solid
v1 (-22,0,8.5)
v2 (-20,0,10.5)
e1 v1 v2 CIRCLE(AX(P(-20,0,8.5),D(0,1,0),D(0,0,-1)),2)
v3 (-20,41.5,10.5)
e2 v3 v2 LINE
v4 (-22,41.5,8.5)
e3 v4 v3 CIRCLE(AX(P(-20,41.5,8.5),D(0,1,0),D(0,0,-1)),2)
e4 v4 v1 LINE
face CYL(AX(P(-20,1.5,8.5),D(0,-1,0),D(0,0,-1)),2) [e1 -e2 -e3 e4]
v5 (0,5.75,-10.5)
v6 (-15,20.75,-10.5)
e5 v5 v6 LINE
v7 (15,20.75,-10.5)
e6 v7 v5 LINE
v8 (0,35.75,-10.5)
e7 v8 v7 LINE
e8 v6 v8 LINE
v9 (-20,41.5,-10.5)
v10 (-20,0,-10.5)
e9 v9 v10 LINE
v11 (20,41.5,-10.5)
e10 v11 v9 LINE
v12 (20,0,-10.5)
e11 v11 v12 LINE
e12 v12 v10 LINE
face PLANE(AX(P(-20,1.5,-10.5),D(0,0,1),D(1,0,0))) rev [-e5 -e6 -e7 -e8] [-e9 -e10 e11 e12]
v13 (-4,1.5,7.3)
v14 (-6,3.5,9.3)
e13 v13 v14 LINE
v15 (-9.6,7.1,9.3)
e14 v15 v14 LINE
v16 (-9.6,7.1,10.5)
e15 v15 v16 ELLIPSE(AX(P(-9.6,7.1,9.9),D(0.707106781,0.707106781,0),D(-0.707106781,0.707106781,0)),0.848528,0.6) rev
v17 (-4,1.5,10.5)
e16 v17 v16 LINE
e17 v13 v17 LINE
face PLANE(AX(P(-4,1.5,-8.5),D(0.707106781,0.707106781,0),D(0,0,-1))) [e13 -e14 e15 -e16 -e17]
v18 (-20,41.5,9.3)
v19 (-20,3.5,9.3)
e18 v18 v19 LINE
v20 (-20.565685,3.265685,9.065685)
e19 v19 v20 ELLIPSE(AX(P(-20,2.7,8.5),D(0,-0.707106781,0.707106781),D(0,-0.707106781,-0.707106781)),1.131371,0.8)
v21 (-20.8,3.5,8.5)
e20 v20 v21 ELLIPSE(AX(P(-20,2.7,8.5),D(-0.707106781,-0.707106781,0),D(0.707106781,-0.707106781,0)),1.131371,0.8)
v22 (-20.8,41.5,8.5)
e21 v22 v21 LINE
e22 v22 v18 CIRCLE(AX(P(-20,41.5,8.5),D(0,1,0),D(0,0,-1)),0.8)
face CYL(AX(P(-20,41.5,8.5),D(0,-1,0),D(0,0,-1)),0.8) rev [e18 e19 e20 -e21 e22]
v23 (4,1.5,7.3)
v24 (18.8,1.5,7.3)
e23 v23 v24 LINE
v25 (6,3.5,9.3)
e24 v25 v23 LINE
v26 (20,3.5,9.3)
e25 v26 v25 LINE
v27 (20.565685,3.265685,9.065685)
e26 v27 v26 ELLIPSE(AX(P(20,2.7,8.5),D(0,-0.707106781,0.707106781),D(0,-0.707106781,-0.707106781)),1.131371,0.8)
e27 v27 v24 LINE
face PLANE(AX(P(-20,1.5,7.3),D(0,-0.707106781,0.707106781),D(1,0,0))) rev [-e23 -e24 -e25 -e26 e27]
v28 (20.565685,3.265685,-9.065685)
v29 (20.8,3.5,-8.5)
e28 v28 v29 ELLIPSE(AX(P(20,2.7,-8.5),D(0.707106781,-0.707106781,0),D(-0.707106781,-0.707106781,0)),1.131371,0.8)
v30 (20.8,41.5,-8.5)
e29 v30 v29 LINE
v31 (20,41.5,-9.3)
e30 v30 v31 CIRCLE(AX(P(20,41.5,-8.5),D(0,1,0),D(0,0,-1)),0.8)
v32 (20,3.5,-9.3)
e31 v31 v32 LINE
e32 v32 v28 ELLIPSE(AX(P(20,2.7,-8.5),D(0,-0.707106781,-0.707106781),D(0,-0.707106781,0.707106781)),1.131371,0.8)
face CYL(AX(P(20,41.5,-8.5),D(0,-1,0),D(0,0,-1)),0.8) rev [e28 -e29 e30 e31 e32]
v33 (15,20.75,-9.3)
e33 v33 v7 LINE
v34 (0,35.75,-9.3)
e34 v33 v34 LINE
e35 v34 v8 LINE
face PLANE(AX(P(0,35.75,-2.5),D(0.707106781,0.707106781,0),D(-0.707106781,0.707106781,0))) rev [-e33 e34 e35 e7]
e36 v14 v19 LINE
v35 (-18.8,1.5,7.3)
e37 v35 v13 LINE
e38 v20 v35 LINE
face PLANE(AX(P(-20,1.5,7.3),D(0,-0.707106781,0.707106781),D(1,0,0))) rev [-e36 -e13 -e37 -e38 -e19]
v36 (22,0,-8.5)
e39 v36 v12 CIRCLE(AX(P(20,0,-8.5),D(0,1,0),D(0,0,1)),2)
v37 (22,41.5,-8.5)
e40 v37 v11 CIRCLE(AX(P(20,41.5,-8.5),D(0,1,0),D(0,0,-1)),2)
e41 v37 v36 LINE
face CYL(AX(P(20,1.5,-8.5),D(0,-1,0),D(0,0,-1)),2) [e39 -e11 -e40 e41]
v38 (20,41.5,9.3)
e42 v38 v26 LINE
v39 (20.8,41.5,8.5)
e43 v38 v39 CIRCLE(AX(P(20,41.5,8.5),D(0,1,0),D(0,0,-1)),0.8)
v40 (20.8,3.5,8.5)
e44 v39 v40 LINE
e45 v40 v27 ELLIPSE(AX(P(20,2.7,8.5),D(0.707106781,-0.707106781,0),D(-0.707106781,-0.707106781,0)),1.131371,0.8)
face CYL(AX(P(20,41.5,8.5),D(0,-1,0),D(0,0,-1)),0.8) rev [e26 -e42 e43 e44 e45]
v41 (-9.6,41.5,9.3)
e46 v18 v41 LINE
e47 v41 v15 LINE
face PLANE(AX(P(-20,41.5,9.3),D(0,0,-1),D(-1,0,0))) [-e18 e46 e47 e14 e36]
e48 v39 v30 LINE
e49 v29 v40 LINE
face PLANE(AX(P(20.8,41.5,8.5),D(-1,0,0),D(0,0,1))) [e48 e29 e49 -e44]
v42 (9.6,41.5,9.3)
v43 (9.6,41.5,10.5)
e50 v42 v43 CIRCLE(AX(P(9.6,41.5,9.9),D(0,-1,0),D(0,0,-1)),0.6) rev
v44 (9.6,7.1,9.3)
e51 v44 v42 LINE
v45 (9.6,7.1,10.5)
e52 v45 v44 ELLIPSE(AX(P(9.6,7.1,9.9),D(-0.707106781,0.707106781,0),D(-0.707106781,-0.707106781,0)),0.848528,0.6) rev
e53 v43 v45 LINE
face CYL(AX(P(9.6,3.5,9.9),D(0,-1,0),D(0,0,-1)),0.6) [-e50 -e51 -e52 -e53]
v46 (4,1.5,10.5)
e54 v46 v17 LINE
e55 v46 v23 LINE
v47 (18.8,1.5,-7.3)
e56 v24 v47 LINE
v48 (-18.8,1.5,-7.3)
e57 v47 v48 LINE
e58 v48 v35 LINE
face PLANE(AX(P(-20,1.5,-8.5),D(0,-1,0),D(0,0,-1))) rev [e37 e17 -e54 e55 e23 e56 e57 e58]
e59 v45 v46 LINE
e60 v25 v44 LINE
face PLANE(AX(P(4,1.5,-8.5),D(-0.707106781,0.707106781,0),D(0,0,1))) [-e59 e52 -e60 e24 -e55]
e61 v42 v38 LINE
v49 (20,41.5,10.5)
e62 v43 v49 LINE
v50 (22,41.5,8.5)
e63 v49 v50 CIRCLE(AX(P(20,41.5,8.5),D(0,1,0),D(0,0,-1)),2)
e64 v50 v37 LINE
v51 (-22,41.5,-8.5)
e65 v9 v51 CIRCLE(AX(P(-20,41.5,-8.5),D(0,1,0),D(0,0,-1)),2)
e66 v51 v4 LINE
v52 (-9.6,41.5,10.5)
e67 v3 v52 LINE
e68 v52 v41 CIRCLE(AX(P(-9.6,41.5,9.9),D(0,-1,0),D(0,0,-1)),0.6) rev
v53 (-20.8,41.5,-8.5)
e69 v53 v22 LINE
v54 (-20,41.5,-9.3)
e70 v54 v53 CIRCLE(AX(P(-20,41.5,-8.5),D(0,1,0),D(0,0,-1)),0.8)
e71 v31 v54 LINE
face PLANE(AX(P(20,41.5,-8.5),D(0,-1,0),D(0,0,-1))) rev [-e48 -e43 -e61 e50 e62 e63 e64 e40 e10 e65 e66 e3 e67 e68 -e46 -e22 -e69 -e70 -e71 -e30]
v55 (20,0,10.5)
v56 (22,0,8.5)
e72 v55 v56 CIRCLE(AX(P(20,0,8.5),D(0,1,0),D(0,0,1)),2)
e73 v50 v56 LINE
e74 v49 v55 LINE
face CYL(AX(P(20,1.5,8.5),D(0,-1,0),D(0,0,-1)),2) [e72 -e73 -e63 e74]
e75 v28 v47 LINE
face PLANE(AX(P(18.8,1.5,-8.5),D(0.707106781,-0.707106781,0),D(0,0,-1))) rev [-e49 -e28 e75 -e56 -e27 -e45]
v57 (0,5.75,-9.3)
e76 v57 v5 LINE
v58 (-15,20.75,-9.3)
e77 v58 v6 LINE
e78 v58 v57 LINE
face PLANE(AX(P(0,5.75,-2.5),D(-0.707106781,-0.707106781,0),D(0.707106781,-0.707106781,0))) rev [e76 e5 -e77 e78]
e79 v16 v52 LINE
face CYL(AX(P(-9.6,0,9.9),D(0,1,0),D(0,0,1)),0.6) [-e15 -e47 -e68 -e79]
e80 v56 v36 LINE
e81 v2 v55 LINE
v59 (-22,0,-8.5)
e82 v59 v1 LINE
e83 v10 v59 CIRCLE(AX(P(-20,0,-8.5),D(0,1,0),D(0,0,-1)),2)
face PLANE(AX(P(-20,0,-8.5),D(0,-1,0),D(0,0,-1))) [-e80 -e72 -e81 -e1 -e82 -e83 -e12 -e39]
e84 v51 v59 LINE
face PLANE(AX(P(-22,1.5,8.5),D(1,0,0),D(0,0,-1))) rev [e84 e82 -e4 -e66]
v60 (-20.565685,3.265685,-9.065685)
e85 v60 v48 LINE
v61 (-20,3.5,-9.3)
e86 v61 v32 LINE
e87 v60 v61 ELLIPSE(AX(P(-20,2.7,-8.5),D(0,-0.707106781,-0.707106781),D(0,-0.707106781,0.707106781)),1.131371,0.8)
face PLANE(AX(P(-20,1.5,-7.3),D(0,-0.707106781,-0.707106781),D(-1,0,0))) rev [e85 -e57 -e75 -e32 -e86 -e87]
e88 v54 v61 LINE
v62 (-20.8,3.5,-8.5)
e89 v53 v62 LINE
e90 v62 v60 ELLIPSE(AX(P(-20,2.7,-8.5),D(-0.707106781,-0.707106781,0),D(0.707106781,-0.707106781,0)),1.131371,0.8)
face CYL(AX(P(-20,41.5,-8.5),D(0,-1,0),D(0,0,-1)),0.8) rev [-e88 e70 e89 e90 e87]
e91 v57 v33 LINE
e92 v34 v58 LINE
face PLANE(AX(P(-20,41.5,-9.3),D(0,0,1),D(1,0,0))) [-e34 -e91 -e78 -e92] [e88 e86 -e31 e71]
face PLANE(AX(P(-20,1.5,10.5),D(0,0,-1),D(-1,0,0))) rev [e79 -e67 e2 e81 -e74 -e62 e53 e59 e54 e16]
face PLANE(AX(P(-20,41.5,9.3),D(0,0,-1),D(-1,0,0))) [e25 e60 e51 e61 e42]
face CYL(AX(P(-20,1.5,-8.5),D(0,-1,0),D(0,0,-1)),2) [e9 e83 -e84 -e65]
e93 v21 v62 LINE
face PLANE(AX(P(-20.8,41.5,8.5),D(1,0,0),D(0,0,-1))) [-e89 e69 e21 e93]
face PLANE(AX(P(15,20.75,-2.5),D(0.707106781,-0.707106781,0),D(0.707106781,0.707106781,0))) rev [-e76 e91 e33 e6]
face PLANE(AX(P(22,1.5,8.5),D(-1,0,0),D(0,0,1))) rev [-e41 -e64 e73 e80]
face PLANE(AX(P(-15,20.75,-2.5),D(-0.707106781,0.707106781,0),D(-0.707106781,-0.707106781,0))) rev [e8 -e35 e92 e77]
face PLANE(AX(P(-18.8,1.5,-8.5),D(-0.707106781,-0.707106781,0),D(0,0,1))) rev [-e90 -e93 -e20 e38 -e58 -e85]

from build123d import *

# Parameters (mm, degrees)
RESSALTO_EXTRUS_O1_DEPTH = 1.5
RESSALTO_EXTRUS_O2_DEPTH = 40
ESBO_O4_W                = 18
ESBO_O4_H                = 3
CORTE_EXTRUS_O1_DEPTH    = 40
CORTE_EXTRUS_O2_DEPTH    = 8
CHANFRO1_SIZE            = 5
CHANFRO2_SIZE            = 2
FILETE2_START            = 6.5
FILETE2_DEPTH            = 35.5
FILETE2_START_2          = -3
FILETE2_2_DEPTH          = 1.232233047
FILETE3_START            = 6.5
FILETE3_DEPTH            = 35.5
FILETE3_START_2          = 1.767766953
FILETE3_2_DEPTH          = 1.232233047


with BuildPart() as part:
    # Esboço1 → Ressalto-extrusão1 (new body)
    with BuildSketch(Plane(origin=(0, 0, 0), x_dir=(1, 0, 0), z_dir=(0, 1, 0))):
        with BuildLine():
            Line((-20, -10.5), (20, -10.5))
            ThreePointArc((20, -10.5), (21.414213562, -9.914213562), (22, -8.5))
            Line((22, -8.5), (22, 8.5))
            ThreePointArc((22, 8.5), (21.414213562, 9.914213562), (20, 10.5))
            Line((20, 10.5), (-20, 10.5))
            ThreePointArc((-20, 10.5), (-21.414213562, 9.914213562), (-22, 8.5))
            Line((-22, 8.5), (-22, -8.5))
            ThreePointArc((-22, -8.5), (-21.414213562, -9.914213562), (-20, -10.5))
        make_face()
    extrude(amount=RESSALTO_EXTRUS_O1_DEPTH)

    # Esboço3 → Ressalto-extrusão2 (add)
    with BuildSketch(Plane(origin=(0, 1.5, 0), x_dir=(1, 0, 0), z_dir=(0, 1, 0))):
        with BuildLine():
            Line((-20, -10.5), (20, -10.5))
            ThreePointArc((20, -10.5), (21.414213562, -9.914213562), (22, -8.5))
            Line((22, -8.5), (22, 8.5))
            ThreePointArc((22, 8.5), (21.414213562, 9.914213562), (20, 10.5))
            Line((20, 10.5), (-20, 10.5))
            ThreePointArc((-20, 10.5), (-21.414213562, 9.914213562), (-22, 8.5))
            Line((-22, 8.5), (-22, -8.5))
            ThreePointArc((-22, -8.5), (-21.414213562, -9.914213562), (-20, -10.5))
        make_face()
        with BuildLine():
            Line((-20, 9.3), (20, 9.3))
            ThreePointArc((20, 9.3), (20.565685425, 9.065685425), (20.8, 8.5))
            Line((20.8, 8.5), (20.8, -8.5))
            ThreePointArc((20.8, -8.5), (20.565685425, -9.065685425), (20, -9.3))
            Line((20, -9.3), (-20, -9.3))
            ThreePointArc((-20, -9.3), (-20.565685425, -9.065685425), (-20.8, -8.5))
            Line((-20.8, -8.5), (-20.8, 8.5))
            ThreePointArc((-20.8, 8.5), (-20.565685425, 9.065685425), (-20, 9.3))
        make_face(mode=Mode.SUBTRACT)
    extrude(amount=RESSALTO_EXTRUS_O2_DEPTH)

    # Esboço4 → Corte-extrusão1 (cut)
    with BuildSketch(Plane(origin=(0, 41.5, 0), x_dir=(1, 0, 0), z_dir=(0, 1, 0))):
        with Locations((0, -9.3)):
            Rectangle(ESBO_O4_W, ESBO_O4_H)
    extrude(amount=-CORTE_EXTRUS_O1_DEPTH, mode=Mode.SUBTRACT)

    # Esboço5 → Corte-extrusão2 (cut)
    with BuildSketch(Plane(origin=(0, 0, -10.5), x_dir=(-1, 0, 0), z_dir=(0, 0, -1))):
        Polygon((0, 5.75), (15, 20.75), (0, 35.75), (-15, 20.75), align=None)
    extrude(amount=-CORTE_EXTRUS_O2_DEPTH, mode=Mode.SUBTRACT)

    # Chanfro1
    chanfro1_edges = [part.edges().sort_by_distance(p)[0] for p in [
        (9, 1.5, 9.9),
        (-9, 1.5, 9.9),
    ]]
    chamfer(chanfro1_edges, length=CHANFRO1_SIZE)

    # Chanfro2
    # the kernel refuses this chamfer: 2 mm, written as the material it adds along each edge
    with BuildSketch(Plane(origin=(-1.143365976, 1.5, 9.3), x_dir=(0, 1, 0), z_dir=(1, 0, 0))) as chanfro2_piece_1_section:
        Polygon((CHANFRO2_SIZE, 0), (0, -CHANFRO2_SIZE), (0, 0), align=None)
    chanfro2_piece_1 = extrude(amount=26.286731952, mode=Mode.PRIVATE)
    chanfro2_piece_1 = split(chanfro2_piece_1, bisect_by=Plane(origin=(20.8, 1.5, 9.3), z_dir=(-1, 0, 0)), keep=Keep.TOP, mode=Mode.PRIVATE)
    chanfro2_piece_1 = split(chanfro2_piece_1, bisect_by=Plane(origin=(1.428317012, -1.071682988, 9.3), z_dir=(0.7071067811865476, -0.7071067811865476, 0)), keep=Keep.TOP, mode=Mode.PRIVATE)
    add(chanfro2_piece_1)
    with BuildSketch(Plane(origin=(20.8, 1.5, -13.643365976), x_dir=(0, 1, 0), z_dir=(0, 0, 1))) as chanfro2_piece_2_section:
        Polygon((CHANFRO2_SIZE, 0), (0, CHANFRO2_SIZE), (0, 0), align=None)
    chanfro2_piece_2 = extrude(amount=27.286731952, mode=Mode.PRIVATE)
    chanfro2_piece_2 = split(chanfro2_piece_2, bisect_by=Plane(origin=(20.8, 1.5, -9.3), z_dir=(0, 0, 1)), keep=Keep.TOP, mode=Mode.PRIVATE)
    chanfro2_piece_2 = split(chanfro2_piece_2, bisect_by=Plane(origin=(20.8, 1.5, 9.3), z_dir=(0, 0, -1)), keep=Keep.TOP, mode=Mode.PRIVATE)
    add(chanfro2_piece_2)
    with BuildSketch(Plane(origin=(-25.143365976, 1.5, 9.3), x_dir=(0, 1, 0), z_dir=(1, 0, 0))) as chanfro2_piece_3_section:
        Polygon((CHANFRO2_SIZE, 0), (0, -CHANFRO2_SIZE), (0, 0), align=None)
    chanfro2_piece_3 = extrude(amount=26.286731952, mode=Mode.PRIVATE)
    chanfro2_piece_3 = split(chanfro2_piece_3, bisect_by=Plane(origin=(-20.8, 1.5, 9.3), z_dir=(1, 0, 0)), keep=Keep.TOP, mode=Mode.PRIVATE)
    chanfro2_piece_3 = split(chanfro2_piece_3, bisect_by=Plane(origin=(-14.571682988, 12.071682988, 9.3), z_dir=(-0.7071067811865476, -0.7071067811865476, 0)), keep=Keep.TOP, mode=Mode.PRIVATE)
    add(chanfro2_piece_3)
    with BuildSketch(Plane(origin=(-20.8, 1.5, 13.643365976), x_dir=(0, 1, 0), z_dir=(0, 0, -1))) as chanfro2_piece_4_section:
        Polygon((CHANFRO2_SIZE, 0), (0, CHANFRO2_SIZE), (0, 0), align=None)
    chanfro2_piece_4 = extrude(amount=27.286731952, mode=Mode.PRIVATE)
    chanfro2_piece_4 = split(chanfro2_piece_4, bisect_by=Plane(origin=(-20.8, 1.5, -9.3), z_dir=(0, 0, 1)), keep=Keep.TOP, mode=Mode.PRIVATE)
    chanfro2_piece_4 = split(chanfro2_piece_4, bisect_by=Plane(origin=(-20.8, 1.5, 9.3), z_dir=(0, 0, -1)), keep=Keep.TOP, mode=Mode.PRIVATE)
    add(chanfro2_piece_4)
    with BuildSketch(Plane(origin=(-25.143365976, 1.5, -9.3), x_dir=(0, 1, 0), z_dir=(1, 0, 0))) as chanfro2_piece_5_section:
        Polygon((CHANFRO2_SIZE, 0), (0, CHANFRO2_SIZE), (0, 0), align=None)
    chanfro2_piece_5 = extrude(amount=50.286731952, mode=Mode.PRIVATE)
    chanfro2_piece_5 = split(chanfro2_piece_5, bisect_by=Plane(origin=(20.8, 1.5, -9.3), z_dir=(-1, 0, 0)), keep=Keep.TOP, mode=Mode.PRIVATE)
    chanfro2_piece_5 = split(chanfro2_piece_5, bisect_by=Plane(origin=(-20.8, 1.5, -9.3), z_dir=(1, 0, 0)), keep=Keep.TOP, mode=Mode.PRIVATE)
    add(chanfro2_piece_5)
    with BuildSketch(Plane(origin=(-20, 1.5, -8.5), x_dir=(-1, 0, 0), z_dir=(0, 0, 1))) as chanfro2_piece_6_section:
        Polygon((0.8, -CHANFRO2_SIZE), (0, -1.2), (0, 0), (0.8, 0), align=None)
    chanfro2_piece_6 = revolve(axis=Axis((-20, 1.5, -8.5), (0, -1, 0)), revolution_arc=90, mode=Mode.PRIVATE)
    chanfro2_piece_6 = split(chanfro2_piece_6, bisect_by=Plane(origin=(-19.4, 2.1, -8.5), z_dir=(-0.7071067811865476, -0.7071067811865476, 0)), keep=Keep.TOP, mode=Mode.PRIVATE)
    add(chanfro2_piece_6)
    with BuildSketch(Plane(origin=(-20, 1.5, -8.5), x_dir=(-1, 0, 0), z_dir=(0, 0, 1))) as chanfro2_piece_7_section:
        Polygon((0.8, -CHANFRO2_SIZE), (0, -1.2), (0, 0), (0.8, 0), align=None)
    chanfro2_piece_7 = revolve(axis=Axis((-20, 1.5, -8.5), (0, -1, 0)), revolution_arc=90, mode=Mode.PRIVATE)
    chanfro2_piece_7 = split(chanfro2_piece_7, bisect_by=Plane(origin=(-20, 2.1, -7.9), z_dir=(0, -0.7071067811865476, -0.7071067811865476)), keep=Keep.TOP, mode=Mode.PRIVATE)
    add(chanfro2_piece_7)
    with BuildSketch(Plane(origin=(20, 1.5, -8.5), x_dir=(0, 0, -1), z_dir=(-1, 0, 0))) as chanfro2_piece_8_section:
        Polygon((0.8, -CHANFRO2_SIZE), (0, -1.2), (0, 0), (0.8, 0), align=None)
    chanfro2_piece_8 = revolve(axis=Axis((20, 1.5, -8.5), (0, -1, 0)), revolution_arc=90, mode=Mode.PRIVATE)
    chanfro2_piece_8 = split(chanfro2_piece_8, bisect_by=Plane(origin=(20, 2.1, -7.9), z_dir=(0, -0.7071067811865476, -0.7071067811865476)), keep=Keep.TOP, mode=Mode.PRIVATE)
    add(chanfro2_piece_8)
    with BuildSketch(Plane(origin=(20, 1.5, -8.5), x_dir=(0, 0, -1), z_dir=(-1, 0, 0))) as chanfro2_piece_9_section:
        Polygon((0.8, -CHANFRO2_SIZE), (0, -1.2), (0, 0), (0.8, 0), align=None)
    chanfro2_piece_9 = revolve(axis=Axis((20, 1.5, -8.5), (0, -1, 0)), revolution_arc=90, mode=Mode.PRIVATE)
    chanfro2_piece_9 = split(chanfro2_piece_9, bisect_by=Plane(origin=(19.4, 2.1, -8.5), z_dir=(0.7071067811865476, -0.7071067811865476, 0)), keep=Keep.TOP, mode=Mode.PRIVATE)
    add(chanfro2_piece_9)
    with BuildSketch(Plane(origin=(-20, 1.5, 8.5), x_dir=(0, 0, 1), z_dir=(1, 0, 0))) as chanfro2_piece_10_section:
        Polygon((0.8, -CHANFRO2_SIZE), (0, -1.2), (0, 0), (0.8, 0), align=None)
    chanfro2_piece_10 = revolve(axis=Axis((-20, 1.5, 8.5), (0, -1, 0)), revolution_arc=90, mode=Mode.PRIVATE)
    chanfro2_piece_10 = split(chanfro2_piece_10, bisect_by=Plane(origin=(-20, 2.1, 7.9), z_dir=(0, -0.7071067811865476, 0.7071067811865476)), keep=Keep.TOP, mode=Mode.PRIVATE)
    add(chanfro2_piece_10)
    with BuildSketch(Plane(origin=(-20, 1.5, 8.5), x_dir=(0, 0, 1), z_dir=(1, 0, 0))) as chanfro2_piece_11_section:
        Polygon((0.8, -CHANFRO2_SIZE), (0, -1.2), (0, 0), (0.8, 0), align=None)
    chanfro2_piece_11 = revolve(axis=Axis((-20, 1.5, 8.5), (0, -1, 0)), revolution_arc=90, mode=Mode.PRIVATE)
    chanfro2_piece_11 = split(chanfro2_piece_11, bisect_by=Plane(origin=(-19.4, 2.1, 8.5), z_dir=(-0.7071067811865476, -0.7071067811865476, 0)), keep=Keep.TOP, mode=Mode.PRIVATE)
    add(chanfro2_piece_11)
    with BuildSketch(Plane(origin=(20, 1.5, 8.5), x_dir=(1, 0, 0), z_dir=(0, 0, -1))) as chanfro2_piece_12_section:
        Polygon((0.8, -CHANFRO2_SIZE), (0, -1.2), (0, 0), (0.8, 0), align=None)
    chanfro2_piece_12 = revolve(axis=Axis((20, 1.5, 8.5), (0, -1, 0)), revolution_arc=90, mode=Mode.PRIVATE)
    chanfro2_piece_12 = split(chanfro2_piece_12, bisect_by=Plane(origin=(19.4, 2.1, 8.5), z_dir=(0.7071067811865476, -0.7071067811865476, 0)), keep=Keep.TOP, mode=Mode.PRIVATE)
    add(chanfro2_piece_12)
    with BuildSketch(Plane(origin=(20, 1.5, 8.5), x_dir=(1, 0, 0), z_dir=(0, 0, -1))) as chanfro2_piece_13_section:
        Polygon((0.8, -CHANFRO2_SIZE), (0, -1.2), (0, 0), (0.8, 0), align=None)
    chanfro2_piece_13 = revolve(axis=Axis((20, 1.5, 8.5), (0, -1, 0)), revolution_arc=90, mode=Mode.PRIVATE)
    chanfro2_piece_13 = split(chanfro2_piece_13, bisect_by=Plane(origin=(20, 2.1, 7.9), z_dir=(0, -0.7071067811865476, 0.7071067811865476)), keep=Keep.TOP, mode=Mode.PRIVATE)
    add(chanfro2_piece_13)

    # Filete2: read off the stored shape, not the designer's step
    # Filete2 outline → Filete2 (cut)
    with BuildSketch(Plane(origin=(0, 0, 0), x_dir=(1, 0, 0), z_dir=(0, 1, 0)).offset(FILETE2_START)):
        with BuildLine():
            ThreePointArc((-9.6, -9.3), (-9.175735931, -9.475735931), (-9, -9.9))
            Line((-9, -9.9), (-9, -9.3))
            Line((-9, -9.3), (-9.6, -9.3))
        make_face()
        with BuildLine():
            ThreePointArc((-9, -9.9), (-9.175735931, -10.324264069), (-9.6, -10.5))
            Line((-9.6, -10.5), (-9, -10.5))
            Line((-9, -10.5), (-9, -9.9))
        make_face()
    extrude(amount=FILETE2_DEPTH, mode=Mode.SUBTRACT)

    # Filete2 2 outline → Filete2 2 (add)
    with BuildSketch(Plane(origin=(0, 0, 0), x_dir=(0.7071067811865509, -0.707106781186544, 0), z_dir=(0.707106781186544, 0.707106781186551, 0)).offset(FILETE2_START_2)):
        with BuildLine():
            Line((-3.889087297, -7.3), (-6.717514421, -9.3))
            Line((-6.717514421, -9.3), (-11.808683246, -9.3))
            add(Edge.make_bspline(
                [(-11.808683246, -10.5), (-10.960155108, -10.5), (-10.960155108, -9.9), (-10.960155108, -9.3), (-11.808683246, -9.3)],
                knots=[1.570796327, 1.570796327, 1.570796327, 3.141592654, 3.141592654, 4.71238898, 4.71238898, 4.71238898], degree=2, weights=[1, 0.707106781, 1, 0.707106781, 1]))
            Line((-11.808683246, -10.5), (-3.889087297, -10.5))
            Line((-3.889087297, -10.5), (-3.889087297, -7.3))
        make_face()
    extrude(amount=FILETE2_2_DEPTH)

    # Filete3: read off the stored shape, not the designer's step
    # Filete3 outline → Filete3 (cut)
    with BuildSketch(Plane(origin=(0, 0, 0), x_dir=(1, 0, 0), z_dir=(0, 1, 0)).offset(FILETE3_START)):
        with BuildLine():
            Line((9, -10.5), (9.6, -10.5))
            ThreePointArc((9.6, -10.5), (9.175735931, -10.324264069), (9, -9.9))
            Line((9, -9.9), (9, -10.5))
        make_face()
        with BuildLine():
            Line((9, -9.3), (9, -9.9))
            ThreePointArc((9, -9.9), (9.175735931, -9.475735931), (9.6, -9.3))
            Line((9.6, -9.3), (9, -9.3))
        make_face()
    extrude(amount=FILETE3_DEPTH, mode=Mode.SUBTRACT)

    # Filete3 2 outline → Filete3 2 (add)
    with BuildSketch(Plane(origin=(0, 0, 0), x_dir=(0.7071067811865509, 0.707106781186544, 0), z_dir=(0.707106781186544, -0.707106781186551, 0)).offset(FILETE3_START_2)):
        with BuildLine():
            Line((11.808683246, 10.5), (3.889087297, 10.5))
            Line((3.889087297, 10.5), (3.889087297, 7.3))
            Line((3.889087297, 7.3), (6.717514421, 9.3))
            Line((6.717514421, 9.3), (11.808683246, 9.3))
            add(Edge.make_bspline(
                [(11.808683246, 9.3), (10.960155108, 9.3), (10.960155108, 9.9), (10.960155108, 10.5), (11.808683246, 10.5)],
                knots=[4.71238898, 4.71238898, 4.71238898, 6.283185307, 6.283185307, 7.853981634, 7.853981634, 7.853981634], degree=2, weights=[1, 0.707106781, 1, 0.707106781, 1]))
        make_face()
    extrude(amount=FILETE3_2_DEPTH)


solid = part.part
